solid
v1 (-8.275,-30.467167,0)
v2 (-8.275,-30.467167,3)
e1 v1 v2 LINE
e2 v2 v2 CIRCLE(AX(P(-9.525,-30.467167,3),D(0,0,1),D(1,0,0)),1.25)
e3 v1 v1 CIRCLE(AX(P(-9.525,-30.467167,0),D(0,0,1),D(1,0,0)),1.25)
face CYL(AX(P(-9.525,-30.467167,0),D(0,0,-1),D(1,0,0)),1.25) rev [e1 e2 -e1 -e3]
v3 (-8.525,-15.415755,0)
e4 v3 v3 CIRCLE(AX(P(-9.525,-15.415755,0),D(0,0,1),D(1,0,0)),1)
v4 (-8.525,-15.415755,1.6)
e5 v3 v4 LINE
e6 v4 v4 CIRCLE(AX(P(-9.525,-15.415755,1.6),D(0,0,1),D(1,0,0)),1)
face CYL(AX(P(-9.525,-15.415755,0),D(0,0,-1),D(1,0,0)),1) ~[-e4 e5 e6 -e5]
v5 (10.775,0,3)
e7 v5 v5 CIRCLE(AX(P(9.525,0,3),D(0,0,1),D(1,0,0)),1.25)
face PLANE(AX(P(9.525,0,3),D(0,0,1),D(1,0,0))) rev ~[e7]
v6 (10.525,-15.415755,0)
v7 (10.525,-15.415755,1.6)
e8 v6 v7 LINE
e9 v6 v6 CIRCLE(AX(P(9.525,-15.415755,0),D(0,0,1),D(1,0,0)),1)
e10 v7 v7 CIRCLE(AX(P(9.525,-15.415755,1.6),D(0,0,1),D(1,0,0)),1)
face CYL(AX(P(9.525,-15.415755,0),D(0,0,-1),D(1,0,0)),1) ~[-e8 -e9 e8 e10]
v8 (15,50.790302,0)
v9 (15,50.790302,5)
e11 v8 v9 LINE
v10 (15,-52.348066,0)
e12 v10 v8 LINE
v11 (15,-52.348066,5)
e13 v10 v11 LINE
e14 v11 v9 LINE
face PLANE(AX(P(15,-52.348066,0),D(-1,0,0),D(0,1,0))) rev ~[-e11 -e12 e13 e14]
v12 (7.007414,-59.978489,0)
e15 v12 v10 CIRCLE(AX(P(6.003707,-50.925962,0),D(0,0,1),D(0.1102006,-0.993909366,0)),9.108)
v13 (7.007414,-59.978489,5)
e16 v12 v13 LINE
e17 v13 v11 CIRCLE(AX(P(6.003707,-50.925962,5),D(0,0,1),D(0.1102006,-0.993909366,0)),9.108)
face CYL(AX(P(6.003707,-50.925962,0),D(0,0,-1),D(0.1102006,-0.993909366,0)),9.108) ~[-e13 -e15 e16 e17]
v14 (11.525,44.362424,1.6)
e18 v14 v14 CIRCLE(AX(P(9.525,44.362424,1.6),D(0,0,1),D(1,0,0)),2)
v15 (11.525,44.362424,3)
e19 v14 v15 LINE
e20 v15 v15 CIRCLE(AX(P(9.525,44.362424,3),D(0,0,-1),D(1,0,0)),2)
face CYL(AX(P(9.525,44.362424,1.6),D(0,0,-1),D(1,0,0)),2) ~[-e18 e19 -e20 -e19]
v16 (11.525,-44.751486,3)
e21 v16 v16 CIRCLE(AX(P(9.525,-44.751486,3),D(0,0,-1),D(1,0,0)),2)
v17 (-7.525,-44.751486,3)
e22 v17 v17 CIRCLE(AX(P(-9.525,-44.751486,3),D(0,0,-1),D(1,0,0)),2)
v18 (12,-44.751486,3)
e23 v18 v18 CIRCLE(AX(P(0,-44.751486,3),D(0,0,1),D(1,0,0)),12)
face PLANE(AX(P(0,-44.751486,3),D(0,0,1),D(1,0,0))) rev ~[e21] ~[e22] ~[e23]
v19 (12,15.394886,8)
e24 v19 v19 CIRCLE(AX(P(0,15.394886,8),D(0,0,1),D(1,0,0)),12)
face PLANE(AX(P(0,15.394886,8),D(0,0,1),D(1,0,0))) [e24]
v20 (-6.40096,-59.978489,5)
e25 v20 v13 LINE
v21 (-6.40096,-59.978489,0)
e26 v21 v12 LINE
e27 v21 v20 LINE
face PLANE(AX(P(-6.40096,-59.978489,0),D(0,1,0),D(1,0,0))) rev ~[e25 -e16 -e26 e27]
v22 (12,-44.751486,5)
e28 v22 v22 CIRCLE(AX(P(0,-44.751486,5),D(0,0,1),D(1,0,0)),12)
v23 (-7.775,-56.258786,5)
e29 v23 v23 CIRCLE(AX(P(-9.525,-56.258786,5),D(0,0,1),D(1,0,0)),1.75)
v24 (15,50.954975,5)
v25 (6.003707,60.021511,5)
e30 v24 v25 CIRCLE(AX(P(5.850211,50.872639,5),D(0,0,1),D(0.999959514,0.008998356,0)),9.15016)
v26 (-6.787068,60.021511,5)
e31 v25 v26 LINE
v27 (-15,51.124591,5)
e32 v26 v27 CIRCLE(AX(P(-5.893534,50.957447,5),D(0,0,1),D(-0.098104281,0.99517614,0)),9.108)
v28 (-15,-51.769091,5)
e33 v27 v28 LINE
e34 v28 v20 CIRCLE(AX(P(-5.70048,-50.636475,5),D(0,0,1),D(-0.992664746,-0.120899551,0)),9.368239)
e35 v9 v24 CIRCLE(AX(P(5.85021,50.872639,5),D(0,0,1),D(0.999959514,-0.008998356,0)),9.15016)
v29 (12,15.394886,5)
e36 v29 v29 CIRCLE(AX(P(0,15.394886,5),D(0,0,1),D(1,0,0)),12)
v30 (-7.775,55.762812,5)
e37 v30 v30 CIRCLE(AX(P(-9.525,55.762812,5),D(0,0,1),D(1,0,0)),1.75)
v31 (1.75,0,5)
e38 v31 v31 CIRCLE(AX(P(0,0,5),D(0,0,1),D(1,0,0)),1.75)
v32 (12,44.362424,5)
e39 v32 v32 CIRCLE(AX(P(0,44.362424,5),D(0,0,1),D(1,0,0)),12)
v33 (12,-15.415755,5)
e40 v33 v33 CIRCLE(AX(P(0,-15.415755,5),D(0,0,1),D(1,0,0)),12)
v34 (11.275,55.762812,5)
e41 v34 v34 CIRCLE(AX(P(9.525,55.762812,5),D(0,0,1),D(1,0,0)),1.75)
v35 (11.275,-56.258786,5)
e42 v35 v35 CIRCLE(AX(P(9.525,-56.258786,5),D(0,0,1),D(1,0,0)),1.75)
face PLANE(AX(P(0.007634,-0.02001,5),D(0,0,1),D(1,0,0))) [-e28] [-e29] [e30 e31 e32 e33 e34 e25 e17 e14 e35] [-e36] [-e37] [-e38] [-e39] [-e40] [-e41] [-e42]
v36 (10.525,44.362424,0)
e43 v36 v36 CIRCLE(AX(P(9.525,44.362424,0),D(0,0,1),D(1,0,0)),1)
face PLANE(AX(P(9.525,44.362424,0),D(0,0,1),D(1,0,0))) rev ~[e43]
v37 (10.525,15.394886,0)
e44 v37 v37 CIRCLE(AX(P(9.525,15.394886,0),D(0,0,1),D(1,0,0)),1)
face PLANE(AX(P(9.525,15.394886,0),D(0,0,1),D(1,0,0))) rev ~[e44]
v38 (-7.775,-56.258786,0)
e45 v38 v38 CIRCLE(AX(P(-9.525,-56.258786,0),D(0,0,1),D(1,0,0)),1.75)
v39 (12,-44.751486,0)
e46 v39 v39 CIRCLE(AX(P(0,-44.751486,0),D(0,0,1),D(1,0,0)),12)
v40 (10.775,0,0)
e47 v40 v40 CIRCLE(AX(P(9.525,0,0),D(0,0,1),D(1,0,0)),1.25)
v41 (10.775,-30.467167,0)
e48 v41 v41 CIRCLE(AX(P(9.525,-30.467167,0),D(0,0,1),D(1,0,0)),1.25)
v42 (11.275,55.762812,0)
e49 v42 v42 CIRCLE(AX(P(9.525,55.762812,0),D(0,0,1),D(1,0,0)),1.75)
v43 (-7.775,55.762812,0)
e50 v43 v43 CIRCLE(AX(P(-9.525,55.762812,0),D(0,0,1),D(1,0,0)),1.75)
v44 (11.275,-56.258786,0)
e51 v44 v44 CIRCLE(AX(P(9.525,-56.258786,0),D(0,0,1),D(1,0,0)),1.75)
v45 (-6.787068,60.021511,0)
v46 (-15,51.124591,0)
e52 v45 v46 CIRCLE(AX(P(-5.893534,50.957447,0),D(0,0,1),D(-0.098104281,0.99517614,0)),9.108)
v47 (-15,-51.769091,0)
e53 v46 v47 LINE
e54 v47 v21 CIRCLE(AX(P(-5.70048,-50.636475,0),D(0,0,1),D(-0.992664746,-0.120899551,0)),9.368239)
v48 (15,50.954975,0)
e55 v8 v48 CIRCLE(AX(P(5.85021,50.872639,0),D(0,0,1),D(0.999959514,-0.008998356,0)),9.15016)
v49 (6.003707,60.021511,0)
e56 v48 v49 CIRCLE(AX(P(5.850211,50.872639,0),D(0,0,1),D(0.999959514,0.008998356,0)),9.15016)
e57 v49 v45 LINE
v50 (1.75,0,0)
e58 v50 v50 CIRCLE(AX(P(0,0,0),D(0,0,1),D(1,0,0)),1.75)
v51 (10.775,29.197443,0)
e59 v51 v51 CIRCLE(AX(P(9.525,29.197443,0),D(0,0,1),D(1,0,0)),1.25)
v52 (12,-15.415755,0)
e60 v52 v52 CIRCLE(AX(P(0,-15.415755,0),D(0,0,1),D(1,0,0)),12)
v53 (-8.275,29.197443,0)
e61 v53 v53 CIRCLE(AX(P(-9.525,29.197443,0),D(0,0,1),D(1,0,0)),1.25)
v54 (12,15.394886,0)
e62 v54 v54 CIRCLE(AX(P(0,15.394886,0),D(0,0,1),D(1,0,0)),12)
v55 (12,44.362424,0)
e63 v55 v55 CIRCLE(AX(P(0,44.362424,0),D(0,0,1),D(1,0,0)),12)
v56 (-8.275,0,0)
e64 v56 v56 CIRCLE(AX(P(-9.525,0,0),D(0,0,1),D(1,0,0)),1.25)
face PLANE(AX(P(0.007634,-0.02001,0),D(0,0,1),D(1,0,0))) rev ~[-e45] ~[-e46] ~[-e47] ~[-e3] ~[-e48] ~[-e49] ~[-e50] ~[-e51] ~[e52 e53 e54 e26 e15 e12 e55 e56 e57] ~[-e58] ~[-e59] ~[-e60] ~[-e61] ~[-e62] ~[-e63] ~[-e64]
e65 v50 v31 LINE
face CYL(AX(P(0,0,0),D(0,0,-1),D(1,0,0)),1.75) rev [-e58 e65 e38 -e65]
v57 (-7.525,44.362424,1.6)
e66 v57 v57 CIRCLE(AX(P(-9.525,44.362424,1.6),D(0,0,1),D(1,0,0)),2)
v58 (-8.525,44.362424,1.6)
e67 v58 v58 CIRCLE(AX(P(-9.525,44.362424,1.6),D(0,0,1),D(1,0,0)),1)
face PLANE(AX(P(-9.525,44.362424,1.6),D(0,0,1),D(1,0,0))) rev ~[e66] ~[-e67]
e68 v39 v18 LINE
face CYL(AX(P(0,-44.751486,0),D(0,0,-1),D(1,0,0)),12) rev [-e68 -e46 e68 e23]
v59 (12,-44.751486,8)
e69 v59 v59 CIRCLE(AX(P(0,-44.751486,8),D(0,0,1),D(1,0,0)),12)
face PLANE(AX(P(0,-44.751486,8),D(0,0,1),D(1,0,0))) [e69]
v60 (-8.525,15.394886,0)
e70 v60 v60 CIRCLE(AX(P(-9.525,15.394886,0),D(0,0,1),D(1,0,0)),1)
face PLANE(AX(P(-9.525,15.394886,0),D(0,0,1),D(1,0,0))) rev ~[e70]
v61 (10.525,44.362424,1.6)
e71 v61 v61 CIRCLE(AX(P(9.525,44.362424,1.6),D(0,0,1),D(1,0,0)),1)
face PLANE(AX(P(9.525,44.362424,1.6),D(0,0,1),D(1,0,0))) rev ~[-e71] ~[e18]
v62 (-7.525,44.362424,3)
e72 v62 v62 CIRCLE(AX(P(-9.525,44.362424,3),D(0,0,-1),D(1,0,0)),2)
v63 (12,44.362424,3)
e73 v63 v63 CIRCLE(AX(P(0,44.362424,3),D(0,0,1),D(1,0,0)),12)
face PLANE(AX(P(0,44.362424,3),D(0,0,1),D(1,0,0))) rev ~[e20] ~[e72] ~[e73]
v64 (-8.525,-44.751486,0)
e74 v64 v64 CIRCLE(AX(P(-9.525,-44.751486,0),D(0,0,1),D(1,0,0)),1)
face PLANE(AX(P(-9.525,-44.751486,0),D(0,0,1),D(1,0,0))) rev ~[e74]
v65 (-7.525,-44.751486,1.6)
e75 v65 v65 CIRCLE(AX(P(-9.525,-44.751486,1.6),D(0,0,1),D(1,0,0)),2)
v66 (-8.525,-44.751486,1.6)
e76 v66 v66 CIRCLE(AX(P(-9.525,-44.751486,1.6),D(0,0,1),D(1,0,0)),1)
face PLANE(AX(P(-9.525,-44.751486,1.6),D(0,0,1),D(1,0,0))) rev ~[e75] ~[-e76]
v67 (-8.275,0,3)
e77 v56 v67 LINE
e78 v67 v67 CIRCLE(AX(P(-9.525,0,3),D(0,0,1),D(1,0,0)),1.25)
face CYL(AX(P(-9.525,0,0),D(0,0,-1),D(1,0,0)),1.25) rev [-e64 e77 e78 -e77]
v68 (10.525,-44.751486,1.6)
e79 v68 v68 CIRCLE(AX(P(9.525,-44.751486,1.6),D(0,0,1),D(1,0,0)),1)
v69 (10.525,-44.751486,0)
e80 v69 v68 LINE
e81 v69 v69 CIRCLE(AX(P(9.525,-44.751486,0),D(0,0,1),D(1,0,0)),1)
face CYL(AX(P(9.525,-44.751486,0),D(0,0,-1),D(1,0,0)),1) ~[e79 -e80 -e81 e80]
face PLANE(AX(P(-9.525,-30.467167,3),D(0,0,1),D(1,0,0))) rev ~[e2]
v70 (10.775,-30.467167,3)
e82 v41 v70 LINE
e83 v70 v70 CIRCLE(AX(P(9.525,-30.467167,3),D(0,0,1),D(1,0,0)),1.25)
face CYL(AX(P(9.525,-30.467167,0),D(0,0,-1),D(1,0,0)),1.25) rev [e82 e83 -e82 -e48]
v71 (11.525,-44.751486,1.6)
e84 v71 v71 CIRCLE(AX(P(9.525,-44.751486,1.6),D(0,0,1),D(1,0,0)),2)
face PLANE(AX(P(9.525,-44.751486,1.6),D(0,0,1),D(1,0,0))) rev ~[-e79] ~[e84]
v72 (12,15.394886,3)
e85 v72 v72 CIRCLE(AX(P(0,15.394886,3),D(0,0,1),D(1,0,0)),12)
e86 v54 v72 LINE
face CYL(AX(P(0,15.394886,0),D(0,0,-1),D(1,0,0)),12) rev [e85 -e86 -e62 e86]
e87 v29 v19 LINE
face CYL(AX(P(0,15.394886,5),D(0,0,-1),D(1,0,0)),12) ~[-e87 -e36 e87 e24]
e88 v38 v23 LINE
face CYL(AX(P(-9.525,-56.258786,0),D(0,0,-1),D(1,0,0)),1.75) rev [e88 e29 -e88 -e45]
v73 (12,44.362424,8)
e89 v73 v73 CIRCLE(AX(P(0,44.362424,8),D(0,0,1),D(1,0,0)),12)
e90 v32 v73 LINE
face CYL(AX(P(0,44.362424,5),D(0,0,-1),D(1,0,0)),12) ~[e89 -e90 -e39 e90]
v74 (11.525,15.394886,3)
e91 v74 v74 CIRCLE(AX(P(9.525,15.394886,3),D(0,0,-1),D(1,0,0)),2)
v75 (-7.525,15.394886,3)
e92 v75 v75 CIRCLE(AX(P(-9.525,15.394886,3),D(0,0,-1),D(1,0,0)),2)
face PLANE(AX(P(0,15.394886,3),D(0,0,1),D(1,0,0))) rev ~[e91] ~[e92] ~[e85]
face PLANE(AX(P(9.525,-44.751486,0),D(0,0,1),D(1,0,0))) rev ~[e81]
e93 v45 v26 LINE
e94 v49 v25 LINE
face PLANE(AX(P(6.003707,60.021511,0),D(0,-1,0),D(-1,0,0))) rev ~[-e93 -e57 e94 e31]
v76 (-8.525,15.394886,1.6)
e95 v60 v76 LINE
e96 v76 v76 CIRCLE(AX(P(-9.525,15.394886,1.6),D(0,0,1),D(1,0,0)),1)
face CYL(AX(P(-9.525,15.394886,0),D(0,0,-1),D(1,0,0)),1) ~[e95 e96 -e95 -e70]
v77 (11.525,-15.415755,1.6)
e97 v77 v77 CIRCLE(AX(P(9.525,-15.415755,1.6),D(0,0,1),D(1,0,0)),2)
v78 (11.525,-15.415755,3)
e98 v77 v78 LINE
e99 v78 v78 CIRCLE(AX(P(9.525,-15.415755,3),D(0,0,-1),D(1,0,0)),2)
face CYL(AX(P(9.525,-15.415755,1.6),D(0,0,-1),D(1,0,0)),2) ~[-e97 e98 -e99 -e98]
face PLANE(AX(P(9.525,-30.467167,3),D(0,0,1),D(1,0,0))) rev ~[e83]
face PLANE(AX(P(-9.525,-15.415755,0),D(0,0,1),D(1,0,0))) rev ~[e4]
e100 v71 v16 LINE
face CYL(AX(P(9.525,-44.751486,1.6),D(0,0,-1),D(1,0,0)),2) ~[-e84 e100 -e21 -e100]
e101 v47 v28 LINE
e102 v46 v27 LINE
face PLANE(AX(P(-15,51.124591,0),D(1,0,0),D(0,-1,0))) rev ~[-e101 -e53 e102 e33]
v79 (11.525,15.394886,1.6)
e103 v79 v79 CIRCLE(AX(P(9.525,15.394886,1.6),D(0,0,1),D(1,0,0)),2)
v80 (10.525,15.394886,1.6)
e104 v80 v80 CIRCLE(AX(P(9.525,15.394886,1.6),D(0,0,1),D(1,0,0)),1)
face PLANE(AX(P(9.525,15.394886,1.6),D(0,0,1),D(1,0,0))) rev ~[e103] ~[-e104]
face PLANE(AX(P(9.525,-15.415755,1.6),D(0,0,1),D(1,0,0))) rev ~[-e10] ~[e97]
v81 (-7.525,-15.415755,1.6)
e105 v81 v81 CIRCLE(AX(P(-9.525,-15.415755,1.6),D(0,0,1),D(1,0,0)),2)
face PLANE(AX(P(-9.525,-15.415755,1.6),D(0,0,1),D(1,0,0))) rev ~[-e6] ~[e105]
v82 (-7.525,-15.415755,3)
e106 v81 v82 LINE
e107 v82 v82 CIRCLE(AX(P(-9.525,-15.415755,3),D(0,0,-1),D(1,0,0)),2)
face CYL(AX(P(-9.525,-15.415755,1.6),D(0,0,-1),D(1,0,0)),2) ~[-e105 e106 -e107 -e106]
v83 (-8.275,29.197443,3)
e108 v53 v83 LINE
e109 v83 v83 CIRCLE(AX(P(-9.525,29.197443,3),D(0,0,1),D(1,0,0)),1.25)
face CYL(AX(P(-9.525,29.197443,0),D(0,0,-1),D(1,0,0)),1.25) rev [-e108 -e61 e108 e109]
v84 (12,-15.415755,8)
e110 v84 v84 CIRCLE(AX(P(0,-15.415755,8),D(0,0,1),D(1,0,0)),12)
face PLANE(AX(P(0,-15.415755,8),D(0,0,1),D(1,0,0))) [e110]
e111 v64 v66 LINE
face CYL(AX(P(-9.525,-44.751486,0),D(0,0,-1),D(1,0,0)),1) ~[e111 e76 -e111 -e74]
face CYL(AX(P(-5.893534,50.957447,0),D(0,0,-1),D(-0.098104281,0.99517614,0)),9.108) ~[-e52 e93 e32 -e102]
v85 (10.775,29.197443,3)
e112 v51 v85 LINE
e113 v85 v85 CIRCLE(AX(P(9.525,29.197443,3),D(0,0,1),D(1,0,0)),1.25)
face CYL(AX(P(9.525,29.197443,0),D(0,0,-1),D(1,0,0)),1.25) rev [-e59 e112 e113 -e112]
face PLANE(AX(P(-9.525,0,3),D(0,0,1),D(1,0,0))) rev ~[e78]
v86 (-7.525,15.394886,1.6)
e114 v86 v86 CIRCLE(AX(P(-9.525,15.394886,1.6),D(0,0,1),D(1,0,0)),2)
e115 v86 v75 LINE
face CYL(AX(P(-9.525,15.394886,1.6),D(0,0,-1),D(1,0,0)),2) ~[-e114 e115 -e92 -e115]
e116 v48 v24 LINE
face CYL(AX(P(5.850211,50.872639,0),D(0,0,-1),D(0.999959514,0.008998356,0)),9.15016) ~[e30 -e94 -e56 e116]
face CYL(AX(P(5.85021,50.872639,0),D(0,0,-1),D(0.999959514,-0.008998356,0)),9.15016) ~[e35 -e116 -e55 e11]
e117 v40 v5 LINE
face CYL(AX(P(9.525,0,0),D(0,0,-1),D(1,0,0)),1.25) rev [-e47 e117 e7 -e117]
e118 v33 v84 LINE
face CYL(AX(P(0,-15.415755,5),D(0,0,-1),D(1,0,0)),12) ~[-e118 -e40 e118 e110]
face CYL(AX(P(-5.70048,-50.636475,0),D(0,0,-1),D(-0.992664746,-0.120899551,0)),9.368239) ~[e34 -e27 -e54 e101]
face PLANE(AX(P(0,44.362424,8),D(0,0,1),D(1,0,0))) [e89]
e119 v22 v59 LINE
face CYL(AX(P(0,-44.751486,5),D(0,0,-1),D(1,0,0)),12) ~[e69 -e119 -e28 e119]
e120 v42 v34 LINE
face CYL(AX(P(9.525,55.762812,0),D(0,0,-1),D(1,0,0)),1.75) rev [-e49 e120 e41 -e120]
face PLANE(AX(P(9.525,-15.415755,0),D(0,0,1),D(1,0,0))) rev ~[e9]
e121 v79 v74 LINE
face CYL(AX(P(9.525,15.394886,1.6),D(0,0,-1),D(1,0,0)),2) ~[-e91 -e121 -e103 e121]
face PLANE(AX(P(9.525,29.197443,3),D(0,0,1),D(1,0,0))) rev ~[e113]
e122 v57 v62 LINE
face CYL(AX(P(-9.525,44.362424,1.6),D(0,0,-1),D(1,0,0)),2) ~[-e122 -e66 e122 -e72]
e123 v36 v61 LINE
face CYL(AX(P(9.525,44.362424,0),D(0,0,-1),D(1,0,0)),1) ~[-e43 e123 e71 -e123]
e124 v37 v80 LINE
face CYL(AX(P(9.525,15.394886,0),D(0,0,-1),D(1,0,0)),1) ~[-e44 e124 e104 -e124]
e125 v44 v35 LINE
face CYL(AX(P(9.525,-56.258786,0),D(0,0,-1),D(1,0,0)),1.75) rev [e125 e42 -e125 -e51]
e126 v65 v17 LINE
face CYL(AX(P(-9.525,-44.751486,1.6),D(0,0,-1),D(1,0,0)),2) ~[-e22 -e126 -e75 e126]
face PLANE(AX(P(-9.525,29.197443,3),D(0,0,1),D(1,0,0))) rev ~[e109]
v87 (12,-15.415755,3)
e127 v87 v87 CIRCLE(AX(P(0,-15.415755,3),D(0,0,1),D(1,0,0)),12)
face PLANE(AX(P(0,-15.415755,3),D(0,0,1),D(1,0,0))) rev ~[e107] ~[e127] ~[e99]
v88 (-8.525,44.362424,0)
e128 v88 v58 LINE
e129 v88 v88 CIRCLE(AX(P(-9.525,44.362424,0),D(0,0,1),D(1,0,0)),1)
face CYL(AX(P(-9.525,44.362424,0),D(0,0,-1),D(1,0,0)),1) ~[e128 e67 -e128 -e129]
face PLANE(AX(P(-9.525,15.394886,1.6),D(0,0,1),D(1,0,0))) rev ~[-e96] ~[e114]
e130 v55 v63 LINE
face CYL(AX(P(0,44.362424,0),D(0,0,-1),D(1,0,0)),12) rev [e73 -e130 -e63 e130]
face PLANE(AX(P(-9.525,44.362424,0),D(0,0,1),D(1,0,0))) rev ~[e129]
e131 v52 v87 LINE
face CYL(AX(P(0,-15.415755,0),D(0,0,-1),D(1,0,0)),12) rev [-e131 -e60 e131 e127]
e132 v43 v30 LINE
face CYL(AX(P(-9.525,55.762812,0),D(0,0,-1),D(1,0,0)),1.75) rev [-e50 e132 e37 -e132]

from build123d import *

# Parameters (mm, degrees)
F0_R          = 1.75
F0_R_2        = 1.25
F0_R_3        = 12
F1_DEPTH      = 5
F0_R_4        = 1
F2_START      = 3
F0_R_5        = 2
F2_DEPTH      = 2
F4_START      = 1.6
F4_DEPTH      = 3.4
F5_DEPTH      = 1.3
F5_DEPTH_BACK = 0.1
F6_START      = 5
F6_DEPTH      = 3


# Not quite as in the source:
# - a feature of the source that left no trace in its solid (it failed there, or was rolled back) is left out


with BuildPart() as f1:
    # F0 (on Top) → F1 (new body)
    with BuildSketch(Plane.XY):
        with BuildLine():
            Line((6.0037070689, 60.0215111673), (-5, 60.0215111673))
            Line((-5, 60.0215111673), (-6.7870675903, 60.0215111673))
            ThreePointArc((-6.7870675903, 60.0215111673), (-12.5859769766, 57.1353808627), (-15, 51.1245913098))
            Line((-15, 51.1245913098), (-15, 50.7903024554))
            Line((-15, 50.7903024554), (-15, -49.5038591325))
            Line((-15, -49.5038591325), (-15, -51.7690908138))
            ThreePointArc((-15, -51.7690908138), (-12.1695256151, -57.4125609321), (-6.4009595691, -59.9784888327))
            Line((-6.4009595691, -59.9784888327), (-5, -59.9784888327))
            Line((-5, -59.9784888327), (5, -59.9784888327))
            Line((5, -59.9784888327), (7.0074141379, -59.9784888327))
            ThreePointArc((7.0074141379, -59.9784888327), (12.2930504345, -57.5138166091), (15, -52.3480655233))
            Line((15, -52.3480655233), (15, -49.5038591325))
            Line((15, -49.5038591325), (15, 50.7903024554))
            Line((15, 50.7903024554), (15, 50.95497525))
            ThreePointArc((15, 50.95497525), (12.3454627339, 57.317569046), (6.0037070689, 60.0215111673))
        make_face()
        with Locations((-9.525, -56.2587864697)):
            Circle(F0_R, mode=Mode.SUBTRACT)
        with Locations((-9.525, -30.4671674967)):
            Circle(F0_R_2, mode=Mode.SUBTRACT)
        with Locations((0, -44.7514858243)):
            Circle(F0_R_3, mode=Mode.SUBTRACT)
        with Locations((-9.525, 0)):
            Circle(F0_R_2, mode=Mode.SUBTRACT)
        with Locations((0, -15.4157546586)):
            Circle(F0_R_3, mode=Mode.SUBTRACT)
        Circle(F0_R, mode=Mode.SUBTRACT)
        with Locations((9.525, -56.2587864697)):
            Circle(F0_R, mode=Mode.SUBTRACT)
        with Locations((9.525, -30.4671674967)):
            Circle(F0_R_2, mode=Mode.SUBTRACT)
        with Locations((9.525, 0)):
            Circle(F0_R_2, mode=Mode.SUBTRACT)
        with Locations((-9.525, 29.1974432766)):
            Circle(F0_R_2, mode=Mode.SUBTRACT)
        with Locations((0, 15.3948861798)):
            Circle(F0_R_3, mode=Mode.SUBTRACT)
        with Locations((-9.525, 55.7628124952)):
            Circle(F0_R, mode=Mode.SUBTRACT)
        with Locations((0, 44.3624239764)):
            Circle(F0_R_3, mode=Mode.SUBTRACT)
        with Locations((9.525, 29.1974432766)):
            Circle(F0_R_2, mode=Mode.SUBTRACT)
        with Locations((9.525, 55.7628124952)):
            Circle(F0_R, mode=Mode.SUBTRACT)
        with BuildLine():
            ThreePointArc((15, 50.7903024554), (15.0003704536, 50.8726388527), (15, 50.95497525))
            Line((15, 50.95497525), (15, 50.7903024554))
        make_face()
    extrude(amount=F1_DEPTH)



with BuildPart() as f1b:
    # F0 (on Top) → F1, piece 2 (new body)
    with BuildSketch(Plane.XY):
        with Locations((-9.525, 44.3624239764)):
            Circle(F0_R_4)
    extrude(amount=F1_DEPTH)


with BuildPart() as f1c:
    # F0 (on Top) → F1, piece 3 (new body)
    with BuildSketch(Plane.XY):
        with Locations((9.525, 44.3624239764)):
            Circle(F0_R_4)
    extrude(amount=F1_DEPTH)


with BuildPart() as f1d:
    # F0 (on Top) → F1, piece 4 (new body)
    with BuildSketch(Plane.XY):
        with Locations((9.525, 15.3948861798)):
            Circle(F0_R_4)
    extrude(amount=F1_DEPTH)


with BuildPart() as f1e:
    # F0 (on Top) → F1, piece 5 (new body)
    with BuildSketch(Plane.XY):
        with Locations((-9.525, 15.3948861798)):
            Circle(F0_R_4)
    extrude(amount=F1_DEPTH)


with BuildPart() as f1f:
    # F0 (on Top) → F1, piece 6 (new body)
    with BuildSketch(Plane.XY):
        with Locations((9.525, -15.4157546586)):
            Circle(F0_R_4)
    extrude(amount=F1_DEPTH)


with BuildPart() as f1g:
    # F0 (on Top) → F1, piece 7 (new body)
    with BuildSketch(Plane.XY):
        with Locations((-9.525, -15.4157546586)):
            Circle(F0_R_4)
    extrude(amount=F1_DEPTH)


with BuildPart() as f1h:
    # F0 (on Top) → F1, piece 8 (new body)
    with BuildSketch(Plane.XY):
        with Locations((9.525, -44.7514858243)):
            Circle(F0_R_4)
    extrude(amount=F1_DEPTH)


with BuildPart() as f1i:
    # F0 (on Top) → F1, piece 9 (new body)
    with BuildSketch(Plane.XY):
        with Locations((-9.525, -44.7514858243)):
            Circle(F0_R_4)
    extrude(amount=F1_DEPTH)


with BuildPart() as f1_1:
    add(f1.part)

    add(f1b.part)  # F2 merges F1b

    add(f1c.part)  # F2 merges F1c

    add(f1d.part)  # F2 merges F1d

    add(f1e.part)  # F2 merges F1e

    add(f1f.part)  # F2 merges F1f

    add(f1g.part)  # F2 merges F1g

    add(f1h.part)  # F2 merges F1h

    add(f1i.part)  # F2 merges F1i
    # F0 (on Top) → F2 (join)
    with BuildSketch(Plane.XY.offset(F2_START)):
        with Locations((0, 44.3624239764)):
            Circle(F0_R_3)
        with Locations((-9.525, 44.3624239764)):
            Circle(F0_R_5, mode=Mode.SUBTRACT)
        with Locations((9.525, 44.3624239764)):
            Circle(F0_R_5, mode=Mode.SUBTRACT)
        with Locations((0, 15.3948861798)):
            Circle(F0_R_3)
        with Locations((-9.525, 15.3948861798)):
            Circle(F0_R_5, mode=Mode.SUBTRACT)
        with Locations((9.525, 15.3948861798)):
            Circle(F0_R_5, mode=Mode.SUBTRACT)
        with Locations((0, -15.4157546586)):
            Circle(F0_R_3)
        with Locations((-9.525, -15.4157546586)):
            Circle(F0_R_5, mode=Mode.SUBTRACT)
        with Locations((9.525, -15.4157546586)):
            Circle(F0_R_5, mode=Mode.SUBTRACT)
        with Locations((0, -44.7514858243)):
            Circle(F0_R_3)
        with Locations((-9.525, -44.7514858243)):
            Circle(F0_R_5, mode=Mode.SUBTRACT)
        with Locations((9.525, -44.7514858243)):
            Circle(F0_R_5, mode=Mode.SUBTRACT)
        with Locations((9.525, 44.3624239764)):
            Circle(F0_R_5)
        with Locations((9.525, 44.3624239764)):
            Circle(F0_R_4, mode=Mode.SUBTRACT)
        with Locations((-9.525, 44.3624239764)):
            Circle(F0_R_5)
        with Locations((-9.525, 44.3624239764)):
            Circle(F0_R_4, mode=Mode.SUBTRACT)
        with Locations((9.525, 15.3948861798)):
            Circle(F0_R_5)
        with Locations((9.525, 15.3948861798)):
            Circle(F0_R_4, mode=Mode.SUBTRACT)
        with Locations((-9.525, 15.3948861798)):
            Circle(F0_R_5)
        with Locations((-9.525, 15.3948861798)):
            Circle(F0_R_4, mode=Mode.SUBTRACT)
        with Locations((9.525, -15.4157546586)):
            Circle(F0_R_5)
        with Locations((9.525, -15.4157546586)):
            Circle(F0_R_4, mode=Mode.SUBTRACT)
        with Locations((-9.525, -15.4157546586)):
            Circle(F0_R_5)
        with Locations((-9.525, -15.4157546586)):
            Circle(F0_R_4, mode=Mode.SUBTRACT)
        with Locations((9.525, -44.7514858243)):
            Circle(F0_R_5)
        with Locations((9.525, -44.7514858243)):
            Circle(F0_R_4, mode=Mode.SUBTRACT)
        with Locations((-9.525, -44.7514858243)):
            Circle(F0_R_5)
        with Locations((-9.525, -44.7514858243)):
            Circle(F0_R_4, mode=Mode.SUBTRACT)
        with Locations((-9.525, -30.4671674967)):
            Circle(F0_R_2)
        with Locations((9.525, -30.4671674967)):
            Circle(F0_R_2)
        with Locations((9.525, 0)):
            Circle(F0_R_2)
        with Locations((-9.525, 0)):
            Circle(F0_R_2)
        with Locations((-9.525, 29.1974432766)):
            Circle(F0_R_2)
        with Locations((9.525, 29.1974432766)):
            Circle(F0_R_2)
        with Locations((9.525, 44.3624239764)):
            Circle(F0_R_4)
        with Locations((-9.525, 44.3624239764)):
            Circle(F0_R_4)
        with Locations((9.525, 15.3948861798)):
            Circle(F0_R_4)
        with Locations((-9.525, 15.3948861798)):
            Circle(F0_R_4)
        with Locations((9.525, -15.4157546586)):
            Circle(F0_R_4)
        with Locations((-9.525, -15.4157546586)):
            Circle(F0_R_4)
        with Locations((9.525, -44.7514858243)):
            Circle(F0_R_4)
        with Locations((-9.525, -44.7514858243)):
            Circle(F0_R_4)
    extrude(amount=F2_DEPTH)

    # F0 (on Top) → F4 (join)
    with BuildSketch(Plane.XY.offset(F4_START)):
        with Locations((9.525, 44.3624239764)):
            Circle(F0_R_5)
        with Locations((9.525, 44.3624239764)):
            Circle(F0_R_4, mode=Mode.SUBTRACT)
        with Locations((-9.525, 44.3624239764)):
            Circle(F0_R_5)
        with Locations((-9.525, 44.3624239764)):
            Circle(F0_R_4, mode=Mode.SUBTRACT)
        with Locations((9.525, 15.3948861798)):
            Circle(F0_R_5)
        with Locations((9.525, 15.3948861798)):
            Circle(F0_R_4, mode=Mode.SUBTRACT)
        with Locations((-9.525, 15.3948861798)):
            Circle(F0_R_5)
        with Locations((-9.525, 15.3948861798)):
            Circle(F0_R_4, mode=Mode.SUBTRACT)
        with Locations((9.525, -15.4157546586)):
            Circle(F0_R_5)
        with Locations((9.525, -15.4157546586)):
            Circle(F0_R_4, mode=Mode.SUBTRACT)
        with Locations((-9.525, -15.4157546586)):
            Circle(F0_R_5)
        with Locations((-9.525, -15.4157546586)):
            Circle(F0_R_4, mode=Mode.SUBTRACT)
        with Locations((9.525, -44.7514858243)):
            Circle(F0_R_5)
        with Locations((9.525, -44.7514858243)):
            Circle(F0_R_4, mode=Mode.SUBTRACT)
        with Locations((-9.525, -44.7514858243)):
            Circle(F0_R_5)
        with Locations((-9.525, -44.7514858243)):
            Circle(F0_R_4, mode=Mode.SUBTRACT)
    extrude(amount=F4_DEPTH)

    # F0 (on Top) → F5 (cut, two sides)
    with BuildSketch(Plane.XY) as f5_sk:
        with Locations((9.525, -56.2587864697)):
            Circle(F0_R)
        with Locations((-9.525, -56.2587864697)):
            Circle(F0_R)
        with Locations((-9.525, -30.4671674967)):
            Circle(F0_R_2)
        with Locations((9.525, -30.4671674967)):
            Circle(F0_R_2)
        with Locations((9.525, 0)):
            Circle(F0_R_2)
        with Locations((-9.525, 0)):
            Circle(F0_R_2)
        with Locations((9.525, 29.1974432766)):
            Circle(F0_R_2)
        with Locations((-9.525, 29.1974432766)):
            Circle(F0_R_2)
        with Locations((9.525, 55.7628124952)):
            Circle(F0_R)
        with Locations((-9.525, 55.7628124952)):
            Circle(F0_R)
    extrude(amount=F5_DEPTH, mode=Mode.SUBTRACT)
    extrude(f5_sk.sketch, amount=-F5_DEPTH_BACK, mode=Mode.SUBTRACT)

    # F0 (on Top) → F6 (join)
    with BuildSketch(Plane.XY.offset(F6_START)):
        with Locations((0, 44.3624239764)):
            Circle(F0_R_3)
        with Locations((-9.525, 44.3624239764)):
            Circle(F0_R_5, mode=Mode.SUBTRACT)
        with Locations((9.525, 44.3624239764)):
            Circle(F0_R_5, mode=Mode.SUBTRACT)
        with Locations((0, 15.3948861798)):
            Circle(F0_R_3)
        with Locations((-9.525, 15.3948861798)):
            Circle(F0_R_5, mode=Mode.SUBTRACT)
        with Locations((9.525, 15.3948861798)):
            Circle(F0_R_5, mode=Mode.SUBTRACT)
        with Locations((0, -15.4157546586)):
            Circle(F0_R_3)
        with Locations((-9.525, -15.4157546586)):
            Circle(F0_R_5, mode=Mode.SUBTRACT)
        with Locations((9.525, -15.4157546586)):
            Circle(F0_R_5, mode=Mode.SUBTRACT)
        with Locations((0, -44.7514858243)):
            Circle(F0_R_3)
        with Locations((-9.525, -44.7514858243)):
            Circle(F0_R_5, mode=Mode.SUBTRACT)
        with Locations((9.525, -44.7514858243)):
            Circle(F0_R_5, mode=Mode.SUBTRACT)
        with Locations((-9.525, -44.7514858243)):
            Circle(F0_R_5)
        with Locations((-9.525, -44.7514858243)):
            Circle(F0_R_4, mode=Mode.SUBTRACT)
        with Locations((9.525, -44.7514858243)):
            Circle(F0_R_5)
        with Locations((9.525, -44.7514858243)):
            Circle(F0_R_4, mode=Mode.SUBTRACT)
        with Locations((-9.525, -15.4157546586)):
            Circle(F0_R_5)
        with Locations((-9.525, -15.4157546586)):
            Circle(F0_R_4, mode=Mode.SUBTRACT)
        with Locations((9.525, -15.4157546586)):
            Circle(F0_R_5)
        with Locations((9.525, -15.4157546586)):
            Circle(F0_R_4, mode=Mode.SUBTRACT)
        with Locations((-9.525, 15.3948861798)):
            Circle(F0_R_5)
        with Locations((-9.525, 15.3948861798)):
            Circle(F0_R_4, mode=Mode.SUBTRACT)
        with Locations((9.525, 15.3948861798)):
            Circle(F0_R_5)
        with Locations((9.525, 15.3948861798)):
            Circle(F0_R_4, mode=Mode.SUBTRACT)
        with Locations((-9.525, 44.3624239764)):
            Circle(F0_R_5)
        with Locations((-9.525, 44.3624239764)):
            Circle(F0_R_4, mode=Mode.SUBTRACT)
        with Locations((9.525, 44.3624239764)):
            Circle(F0_R_5)
        with Locations((9.525, 44.3624239764)):
            Circle(F0_R_4, mode=Mode.SUBTRACT)
        with Locations((-9.525, -44.7514858243)):
            Circle(F0_R_4)
        with Locations((9.525, -44.7514858243)):
            Circle(F0_R_4)
        with Locations((-9.525, -15.4157546586)):
            Circle(F0_R_4)
        with Locations((9.525, -15.4157546586)):
            Circle(F0_R_4)
        with Locations((-9.525, 15.3948861798)):
            Circle(F0_R_4)
        with Locations((9.525, 15.3948861798)):
            Circle(F0_R_4)
        with Locations((-9.525, 44.3624239764)):
            Circle(F0_R_4)
        with Locations((9.525, 44.3624239764)):
            Circle(F0_R_4)
    extrude(amount=F6_DEPTH)


solid = f1_1.part
